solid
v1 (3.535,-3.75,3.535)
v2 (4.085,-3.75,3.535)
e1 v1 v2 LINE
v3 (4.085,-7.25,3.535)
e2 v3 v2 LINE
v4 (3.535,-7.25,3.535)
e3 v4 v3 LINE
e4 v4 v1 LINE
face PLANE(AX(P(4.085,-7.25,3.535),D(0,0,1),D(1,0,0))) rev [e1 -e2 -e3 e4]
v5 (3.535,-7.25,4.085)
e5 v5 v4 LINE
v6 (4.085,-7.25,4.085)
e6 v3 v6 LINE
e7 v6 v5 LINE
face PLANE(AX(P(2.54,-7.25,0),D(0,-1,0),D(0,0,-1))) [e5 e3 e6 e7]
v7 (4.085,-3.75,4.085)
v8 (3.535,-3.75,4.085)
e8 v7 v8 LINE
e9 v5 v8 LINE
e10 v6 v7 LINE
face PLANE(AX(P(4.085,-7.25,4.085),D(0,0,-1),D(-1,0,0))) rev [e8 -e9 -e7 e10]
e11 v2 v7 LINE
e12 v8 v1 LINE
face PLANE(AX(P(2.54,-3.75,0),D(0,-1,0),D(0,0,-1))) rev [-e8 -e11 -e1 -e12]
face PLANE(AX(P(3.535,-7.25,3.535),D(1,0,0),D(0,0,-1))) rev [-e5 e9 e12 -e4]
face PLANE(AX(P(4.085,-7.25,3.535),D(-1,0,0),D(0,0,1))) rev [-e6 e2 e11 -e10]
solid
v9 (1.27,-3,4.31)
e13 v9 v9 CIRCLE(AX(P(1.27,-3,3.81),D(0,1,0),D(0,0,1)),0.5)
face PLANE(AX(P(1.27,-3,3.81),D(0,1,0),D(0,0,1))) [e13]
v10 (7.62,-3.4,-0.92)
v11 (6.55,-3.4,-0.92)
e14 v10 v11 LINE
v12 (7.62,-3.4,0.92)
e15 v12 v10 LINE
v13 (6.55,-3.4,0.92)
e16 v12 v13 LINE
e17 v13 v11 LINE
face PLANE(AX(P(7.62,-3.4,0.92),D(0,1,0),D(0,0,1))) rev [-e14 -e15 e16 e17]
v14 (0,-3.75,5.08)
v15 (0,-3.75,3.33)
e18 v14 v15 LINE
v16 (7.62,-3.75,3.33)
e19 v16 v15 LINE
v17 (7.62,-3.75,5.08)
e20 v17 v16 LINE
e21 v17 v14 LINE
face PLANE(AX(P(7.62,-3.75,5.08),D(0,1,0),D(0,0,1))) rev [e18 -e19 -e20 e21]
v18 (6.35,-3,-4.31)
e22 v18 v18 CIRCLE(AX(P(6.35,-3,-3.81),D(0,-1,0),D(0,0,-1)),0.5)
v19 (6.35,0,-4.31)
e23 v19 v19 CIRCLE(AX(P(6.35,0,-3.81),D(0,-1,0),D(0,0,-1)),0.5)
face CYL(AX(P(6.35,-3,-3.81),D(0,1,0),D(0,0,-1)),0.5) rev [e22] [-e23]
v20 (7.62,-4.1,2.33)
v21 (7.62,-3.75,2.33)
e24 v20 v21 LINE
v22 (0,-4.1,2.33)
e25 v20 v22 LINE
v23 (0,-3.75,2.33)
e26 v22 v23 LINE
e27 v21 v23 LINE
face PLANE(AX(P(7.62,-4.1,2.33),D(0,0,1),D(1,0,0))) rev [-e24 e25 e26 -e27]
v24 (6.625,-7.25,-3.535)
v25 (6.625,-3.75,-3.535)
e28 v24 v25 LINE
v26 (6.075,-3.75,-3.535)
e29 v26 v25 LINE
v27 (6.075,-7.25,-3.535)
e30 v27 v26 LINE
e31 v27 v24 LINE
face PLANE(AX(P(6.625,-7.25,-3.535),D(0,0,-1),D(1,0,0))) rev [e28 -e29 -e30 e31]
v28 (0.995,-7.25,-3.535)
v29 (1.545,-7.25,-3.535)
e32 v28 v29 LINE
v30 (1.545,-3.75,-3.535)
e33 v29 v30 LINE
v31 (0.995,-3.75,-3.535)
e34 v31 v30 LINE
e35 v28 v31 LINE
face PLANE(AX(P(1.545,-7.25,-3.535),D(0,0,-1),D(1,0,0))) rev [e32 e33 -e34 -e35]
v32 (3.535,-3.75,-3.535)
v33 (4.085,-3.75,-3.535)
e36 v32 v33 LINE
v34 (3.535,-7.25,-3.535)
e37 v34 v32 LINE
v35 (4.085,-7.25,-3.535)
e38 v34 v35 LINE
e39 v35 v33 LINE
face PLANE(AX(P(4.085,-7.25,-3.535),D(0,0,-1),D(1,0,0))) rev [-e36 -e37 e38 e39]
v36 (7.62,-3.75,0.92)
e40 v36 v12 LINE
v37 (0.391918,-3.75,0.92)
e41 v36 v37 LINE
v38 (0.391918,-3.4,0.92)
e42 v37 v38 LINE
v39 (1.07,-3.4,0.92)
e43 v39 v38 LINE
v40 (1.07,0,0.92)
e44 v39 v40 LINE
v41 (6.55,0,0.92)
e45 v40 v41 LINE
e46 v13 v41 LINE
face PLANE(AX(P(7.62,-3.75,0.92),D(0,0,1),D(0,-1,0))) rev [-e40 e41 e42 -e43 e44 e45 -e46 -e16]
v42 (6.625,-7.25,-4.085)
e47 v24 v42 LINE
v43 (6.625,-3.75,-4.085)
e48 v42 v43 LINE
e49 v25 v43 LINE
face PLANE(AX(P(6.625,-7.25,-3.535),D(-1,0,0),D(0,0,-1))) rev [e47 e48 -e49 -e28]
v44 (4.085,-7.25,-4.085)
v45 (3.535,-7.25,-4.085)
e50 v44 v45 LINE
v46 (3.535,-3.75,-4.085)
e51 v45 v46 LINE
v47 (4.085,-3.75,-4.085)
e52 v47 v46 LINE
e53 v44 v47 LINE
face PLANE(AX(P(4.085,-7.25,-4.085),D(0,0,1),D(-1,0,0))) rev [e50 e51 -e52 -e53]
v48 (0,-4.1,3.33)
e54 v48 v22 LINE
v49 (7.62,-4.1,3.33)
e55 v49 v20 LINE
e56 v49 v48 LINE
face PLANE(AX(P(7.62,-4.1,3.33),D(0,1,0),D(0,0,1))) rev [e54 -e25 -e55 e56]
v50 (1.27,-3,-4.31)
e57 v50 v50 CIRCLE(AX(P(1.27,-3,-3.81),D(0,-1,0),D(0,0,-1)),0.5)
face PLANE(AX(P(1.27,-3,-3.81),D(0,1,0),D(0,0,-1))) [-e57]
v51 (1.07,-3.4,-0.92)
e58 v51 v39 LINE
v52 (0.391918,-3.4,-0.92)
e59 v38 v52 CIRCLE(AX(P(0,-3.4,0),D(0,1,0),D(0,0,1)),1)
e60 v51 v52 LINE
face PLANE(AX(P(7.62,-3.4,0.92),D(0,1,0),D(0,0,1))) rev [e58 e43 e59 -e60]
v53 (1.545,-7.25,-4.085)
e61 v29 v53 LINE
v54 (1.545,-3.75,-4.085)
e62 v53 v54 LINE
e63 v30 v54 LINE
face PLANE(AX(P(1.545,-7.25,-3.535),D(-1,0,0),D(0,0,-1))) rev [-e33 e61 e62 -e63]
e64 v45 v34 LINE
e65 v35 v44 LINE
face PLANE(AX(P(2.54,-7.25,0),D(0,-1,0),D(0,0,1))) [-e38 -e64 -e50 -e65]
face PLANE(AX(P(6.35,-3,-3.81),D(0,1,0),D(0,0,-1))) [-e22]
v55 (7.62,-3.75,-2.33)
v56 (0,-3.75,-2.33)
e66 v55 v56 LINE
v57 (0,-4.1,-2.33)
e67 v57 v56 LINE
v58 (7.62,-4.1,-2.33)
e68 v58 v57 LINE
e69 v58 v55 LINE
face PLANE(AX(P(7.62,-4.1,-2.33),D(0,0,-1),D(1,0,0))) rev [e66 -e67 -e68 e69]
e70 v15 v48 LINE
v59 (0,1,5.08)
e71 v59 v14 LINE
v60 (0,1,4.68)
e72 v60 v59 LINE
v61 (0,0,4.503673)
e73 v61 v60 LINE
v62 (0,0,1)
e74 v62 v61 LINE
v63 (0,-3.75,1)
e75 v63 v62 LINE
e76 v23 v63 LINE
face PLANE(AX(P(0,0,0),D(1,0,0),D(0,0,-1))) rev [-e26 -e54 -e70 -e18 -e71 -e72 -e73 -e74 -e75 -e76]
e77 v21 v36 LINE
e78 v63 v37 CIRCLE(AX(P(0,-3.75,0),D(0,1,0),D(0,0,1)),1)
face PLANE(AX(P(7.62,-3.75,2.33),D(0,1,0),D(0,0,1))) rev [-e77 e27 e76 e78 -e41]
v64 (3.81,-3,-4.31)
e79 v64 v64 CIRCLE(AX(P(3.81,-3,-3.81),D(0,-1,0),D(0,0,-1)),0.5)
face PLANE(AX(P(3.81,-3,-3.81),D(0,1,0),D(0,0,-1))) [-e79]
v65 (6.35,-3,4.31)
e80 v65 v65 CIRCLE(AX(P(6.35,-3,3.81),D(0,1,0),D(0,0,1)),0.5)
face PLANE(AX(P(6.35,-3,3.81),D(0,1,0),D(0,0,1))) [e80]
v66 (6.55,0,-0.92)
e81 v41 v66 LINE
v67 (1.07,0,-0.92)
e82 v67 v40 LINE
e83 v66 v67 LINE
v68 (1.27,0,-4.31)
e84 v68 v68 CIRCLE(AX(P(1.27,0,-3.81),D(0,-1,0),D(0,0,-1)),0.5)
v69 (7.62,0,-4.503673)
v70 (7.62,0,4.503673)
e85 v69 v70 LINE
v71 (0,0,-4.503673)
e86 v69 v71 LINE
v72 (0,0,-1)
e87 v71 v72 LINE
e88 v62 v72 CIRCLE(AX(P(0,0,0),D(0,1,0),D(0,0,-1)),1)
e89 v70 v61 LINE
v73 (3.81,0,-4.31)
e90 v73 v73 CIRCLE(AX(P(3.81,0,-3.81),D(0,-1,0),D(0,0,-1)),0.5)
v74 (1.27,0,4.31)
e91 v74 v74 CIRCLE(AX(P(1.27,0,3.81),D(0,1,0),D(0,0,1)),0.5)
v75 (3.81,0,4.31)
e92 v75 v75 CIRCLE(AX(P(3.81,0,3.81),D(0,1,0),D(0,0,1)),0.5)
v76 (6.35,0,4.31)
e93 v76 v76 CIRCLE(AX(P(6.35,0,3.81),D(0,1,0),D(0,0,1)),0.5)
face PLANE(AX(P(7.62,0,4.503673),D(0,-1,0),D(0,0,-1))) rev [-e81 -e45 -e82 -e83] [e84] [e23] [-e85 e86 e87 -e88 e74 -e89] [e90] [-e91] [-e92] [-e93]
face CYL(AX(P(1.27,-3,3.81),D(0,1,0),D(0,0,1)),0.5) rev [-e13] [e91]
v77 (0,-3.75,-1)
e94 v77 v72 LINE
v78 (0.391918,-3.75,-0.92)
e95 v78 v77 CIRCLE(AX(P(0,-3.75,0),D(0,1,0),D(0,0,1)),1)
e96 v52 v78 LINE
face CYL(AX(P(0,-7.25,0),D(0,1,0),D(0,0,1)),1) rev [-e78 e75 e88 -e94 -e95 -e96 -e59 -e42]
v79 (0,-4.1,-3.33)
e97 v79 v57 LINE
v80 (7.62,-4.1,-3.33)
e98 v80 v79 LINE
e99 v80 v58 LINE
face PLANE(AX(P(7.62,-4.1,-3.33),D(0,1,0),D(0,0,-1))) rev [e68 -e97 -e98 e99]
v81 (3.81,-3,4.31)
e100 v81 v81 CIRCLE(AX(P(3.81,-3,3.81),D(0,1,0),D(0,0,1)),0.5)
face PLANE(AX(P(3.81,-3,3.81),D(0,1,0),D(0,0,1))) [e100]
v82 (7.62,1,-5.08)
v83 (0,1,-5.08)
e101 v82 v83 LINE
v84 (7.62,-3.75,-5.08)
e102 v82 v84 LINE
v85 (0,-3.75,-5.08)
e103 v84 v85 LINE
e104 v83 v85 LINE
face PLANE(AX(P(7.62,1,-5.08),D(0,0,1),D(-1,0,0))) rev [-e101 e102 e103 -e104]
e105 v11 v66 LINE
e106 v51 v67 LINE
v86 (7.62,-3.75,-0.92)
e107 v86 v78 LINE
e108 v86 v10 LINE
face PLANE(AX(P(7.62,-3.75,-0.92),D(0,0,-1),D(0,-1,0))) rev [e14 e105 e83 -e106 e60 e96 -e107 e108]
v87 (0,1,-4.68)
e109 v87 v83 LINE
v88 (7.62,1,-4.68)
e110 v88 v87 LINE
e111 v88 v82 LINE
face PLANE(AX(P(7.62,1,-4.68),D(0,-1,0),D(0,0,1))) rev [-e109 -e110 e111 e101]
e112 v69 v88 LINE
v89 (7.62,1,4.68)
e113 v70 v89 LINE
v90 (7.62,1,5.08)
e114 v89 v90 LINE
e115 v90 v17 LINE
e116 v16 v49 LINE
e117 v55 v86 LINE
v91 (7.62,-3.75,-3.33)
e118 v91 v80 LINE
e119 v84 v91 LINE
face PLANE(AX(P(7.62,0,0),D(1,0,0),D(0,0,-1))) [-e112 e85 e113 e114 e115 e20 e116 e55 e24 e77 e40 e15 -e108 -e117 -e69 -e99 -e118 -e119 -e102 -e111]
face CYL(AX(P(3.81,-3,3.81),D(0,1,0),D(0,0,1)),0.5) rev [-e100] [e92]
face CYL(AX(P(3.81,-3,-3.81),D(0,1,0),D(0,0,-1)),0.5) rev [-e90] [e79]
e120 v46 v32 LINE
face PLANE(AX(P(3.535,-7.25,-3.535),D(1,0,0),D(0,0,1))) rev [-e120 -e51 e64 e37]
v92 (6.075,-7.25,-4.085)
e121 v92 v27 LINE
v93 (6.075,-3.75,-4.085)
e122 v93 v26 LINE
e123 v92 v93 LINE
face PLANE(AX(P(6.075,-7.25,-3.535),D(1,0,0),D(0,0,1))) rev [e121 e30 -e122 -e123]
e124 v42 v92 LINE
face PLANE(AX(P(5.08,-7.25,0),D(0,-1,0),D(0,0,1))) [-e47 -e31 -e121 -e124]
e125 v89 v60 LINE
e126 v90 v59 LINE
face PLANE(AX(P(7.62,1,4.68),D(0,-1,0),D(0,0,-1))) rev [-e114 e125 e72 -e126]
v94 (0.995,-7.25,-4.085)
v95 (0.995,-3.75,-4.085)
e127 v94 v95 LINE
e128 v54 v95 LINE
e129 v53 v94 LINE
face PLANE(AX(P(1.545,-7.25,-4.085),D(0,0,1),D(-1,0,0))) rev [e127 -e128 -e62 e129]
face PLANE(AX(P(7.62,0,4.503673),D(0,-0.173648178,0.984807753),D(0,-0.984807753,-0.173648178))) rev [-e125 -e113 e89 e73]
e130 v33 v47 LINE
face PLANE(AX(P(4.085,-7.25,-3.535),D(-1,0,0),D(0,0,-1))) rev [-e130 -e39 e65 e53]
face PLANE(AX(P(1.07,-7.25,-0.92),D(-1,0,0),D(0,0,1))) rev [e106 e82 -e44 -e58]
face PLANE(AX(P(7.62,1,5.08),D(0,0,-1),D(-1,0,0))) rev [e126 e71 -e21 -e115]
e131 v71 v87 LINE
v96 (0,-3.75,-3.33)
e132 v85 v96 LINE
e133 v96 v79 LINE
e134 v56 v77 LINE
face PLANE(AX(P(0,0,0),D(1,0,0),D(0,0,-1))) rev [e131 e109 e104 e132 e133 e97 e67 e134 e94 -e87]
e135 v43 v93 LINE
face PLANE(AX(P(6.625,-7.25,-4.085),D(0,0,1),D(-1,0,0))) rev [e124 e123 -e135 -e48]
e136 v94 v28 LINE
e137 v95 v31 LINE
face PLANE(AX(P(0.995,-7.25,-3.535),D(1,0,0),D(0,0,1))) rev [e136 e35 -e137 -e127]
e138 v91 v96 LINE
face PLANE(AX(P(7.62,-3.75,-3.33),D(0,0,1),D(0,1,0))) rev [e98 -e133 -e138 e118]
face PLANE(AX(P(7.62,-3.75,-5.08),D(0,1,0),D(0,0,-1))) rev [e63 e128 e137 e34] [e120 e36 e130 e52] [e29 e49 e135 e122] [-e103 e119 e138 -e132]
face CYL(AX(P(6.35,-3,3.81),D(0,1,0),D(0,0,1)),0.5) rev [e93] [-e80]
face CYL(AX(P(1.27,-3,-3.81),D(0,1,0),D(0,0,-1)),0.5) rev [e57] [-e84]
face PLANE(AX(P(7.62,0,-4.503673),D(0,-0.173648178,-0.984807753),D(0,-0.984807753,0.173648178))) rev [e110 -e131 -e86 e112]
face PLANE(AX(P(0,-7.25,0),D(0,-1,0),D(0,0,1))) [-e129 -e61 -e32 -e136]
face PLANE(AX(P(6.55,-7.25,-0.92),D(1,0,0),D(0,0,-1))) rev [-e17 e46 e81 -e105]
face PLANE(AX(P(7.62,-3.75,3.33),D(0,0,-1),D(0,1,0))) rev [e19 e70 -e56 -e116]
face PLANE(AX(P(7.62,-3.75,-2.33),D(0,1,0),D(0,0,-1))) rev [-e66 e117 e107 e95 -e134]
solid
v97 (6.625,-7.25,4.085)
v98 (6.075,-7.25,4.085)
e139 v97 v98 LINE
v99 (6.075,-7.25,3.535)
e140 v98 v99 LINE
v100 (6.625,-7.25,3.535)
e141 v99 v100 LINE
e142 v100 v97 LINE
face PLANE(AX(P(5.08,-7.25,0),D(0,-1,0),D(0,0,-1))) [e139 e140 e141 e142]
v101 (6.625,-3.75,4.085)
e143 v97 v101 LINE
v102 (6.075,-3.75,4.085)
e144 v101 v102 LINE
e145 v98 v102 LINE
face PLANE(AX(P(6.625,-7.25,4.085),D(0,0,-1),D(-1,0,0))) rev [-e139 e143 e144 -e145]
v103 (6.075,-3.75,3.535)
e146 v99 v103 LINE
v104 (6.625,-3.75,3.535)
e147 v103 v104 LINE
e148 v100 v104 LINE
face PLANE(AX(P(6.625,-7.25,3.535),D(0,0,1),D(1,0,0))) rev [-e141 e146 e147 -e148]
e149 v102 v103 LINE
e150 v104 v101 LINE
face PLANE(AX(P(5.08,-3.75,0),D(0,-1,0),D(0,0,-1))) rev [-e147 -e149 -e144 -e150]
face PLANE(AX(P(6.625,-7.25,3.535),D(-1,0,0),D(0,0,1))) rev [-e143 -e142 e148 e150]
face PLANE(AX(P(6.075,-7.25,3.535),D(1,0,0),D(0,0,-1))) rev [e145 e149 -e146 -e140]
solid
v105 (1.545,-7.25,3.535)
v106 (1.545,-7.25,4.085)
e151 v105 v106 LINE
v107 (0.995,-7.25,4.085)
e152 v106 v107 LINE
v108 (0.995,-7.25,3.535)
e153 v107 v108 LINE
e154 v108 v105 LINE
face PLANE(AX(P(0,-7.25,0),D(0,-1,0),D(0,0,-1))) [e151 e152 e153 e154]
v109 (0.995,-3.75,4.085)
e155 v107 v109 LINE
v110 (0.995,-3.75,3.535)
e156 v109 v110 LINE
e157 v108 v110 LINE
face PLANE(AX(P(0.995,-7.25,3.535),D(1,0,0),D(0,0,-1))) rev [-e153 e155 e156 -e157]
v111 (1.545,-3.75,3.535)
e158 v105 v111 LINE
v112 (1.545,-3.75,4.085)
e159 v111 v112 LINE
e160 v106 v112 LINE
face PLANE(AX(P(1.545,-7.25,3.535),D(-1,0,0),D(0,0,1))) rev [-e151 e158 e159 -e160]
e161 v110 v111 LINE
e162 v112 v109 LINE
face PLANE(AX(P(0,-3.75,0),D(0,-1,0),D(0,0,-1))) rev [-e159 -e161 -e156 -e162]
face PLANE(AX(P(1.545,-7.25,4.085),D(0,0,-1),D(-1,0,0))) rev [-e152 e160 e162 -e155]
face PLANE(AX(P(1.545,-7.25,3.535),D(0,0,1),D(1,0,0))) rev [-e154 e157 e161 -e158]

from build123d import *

# Parameters (mm, degrees)
SOCKET_HOUSING_DEPTH  = 7.62
SKETCH3_R             = 0.5
HOLES_DEPTH           = 3
SKETCH4_W             = 0.55
SKETCH4_H             = 0.55
PINS_DEPTH            = 3.5
LPATTERN3_START       = 6.075
LPATTERN3_OUTLINE_W   = 3.5
LPATTERN3_OUTLINE_H   = 0.55
LPATTERN3_DEPTH       = 0.55
LPATTERN3_START_2     = 3.535
LPATTERN3_2_OUTLINE_W = 3.5
LPATTERN3_2_OUTLINE_H = 0.55
LPATTERN3_2_DEPTH     = 0.55
LPATTERN3_START_3     = -3
LPATTERN3_3_OUTLINE_R = 0.5
LPATTERN3_3_DEPTH     = 3
MIRROR2_START         = -3
MIRROR2_OUTLINE_R     = 0.5
MIRROR2_DEPTH         = 3
MIRROR2_START_2       = -7.25
MIRROR2_2_OUTLINE_W   = 0.55
MIRROR2_2_OUTLINE_H   = 0.55
MIRROR2_2_DEPTH       = 3.5
SKETCH5_W             = 5.48
SKETCH5_H             = 1.84
CUT_EXTRUDE3_DEPTH    = 12.6804666


# Read off the part's stored shape, not the designer's step: LPattern3, Mirror2
with BuildPart() as part:
    # Sketch2 → socket_housing (new body)
    with BuildSketch(Plane(origin=(0, 0, 0), x_dir=(0, 0, -1), z_dir=(1, 0, 0))):
        Polygon((-5.08, -3.75), (-3.33, -3.75), (-3.33, -4.1), (-2.33, -4.1), (-2.33, -3.75), (-0.92, -3.75), (-0.92, -3.4), (0, -3.4), (0, 0), (-4.503673019, 0), (-4.68, 1), (-5.08, 1), align=None)
    socket_housing = extrude(amount=SOCKET_HOUSING_DEPTH)

    # Sketch3 → holes (cut)
    with BuildSketch(Plane(origin=(0, 0, 0), x_dir=(1, 0, 0), z_dir=(0, 1, 0))):
        with Locations(Location((1.27, -3.81, 0), (0, 0, 270))):
            Circle(SKETCH3_R)
    extrude(amount=-HOLES_DEPTH, mode=Mode.SUBTRACT)

    # LPattern3 3 outline → LPattern3 3 (cut)
    with BuildSketch(Plane(origin=(0, 0, 0), x_dir=(1, 0, 0), z_dir=(0, 1, 0)).offset(LPATTERN3_START_3)):
        with Locations((6.35, -3.81)):
            Circle(LPATTERN3_3_OUTLINE_R)
        with Locations((3.81, -3.81)):
            Circle(LPATTERN3_3_OUTLINE_R)
    extrude(amount=LPATTERN3_3_DEPTH, mode=Mode.SUBTRACT)

    # Mirror1: socket_housing across plane
    add(socket_housing.mirror(Plane.XY))

    # Mirror2 outline → Mirror2 (cut)
    with BuildSketch(Plane(origin=(0, 0, 0), x_dir=(1, 0, 0), z_dir=(0, 1, 0)).offset(MIRROR2_START)):
        with Locations((6.35, 3.81)):
            Circle(MIRROR2_OUTLINE_R)
        with Locations((3.81, 3.81)):
            Circle(MIRROR2_OUTLINE_R)
        with Locations((1.27, 3.81)):
            Circle(MIRROR2_OUTLINE_R)
    extrude(amount=MIRROR2_DEPTH, mode=Mode.SUBTRACT)

    # Mirror2 2 outline → Mirror2 2 (add)
    with BuildSketch(Plane(origin=(0, 0, 0), x_dir=(1, 0, 0), z_dir=(0, 1, 0)).offset(MIRROR2_START_2)):
        with Locations((6.35, 3.81)):
            Rectangle(MIRROR2_2_OUTLINE_W, MIRROR2_2_OUTLINE_H)
        with Locations((3.81, 3.81)):
            Rectangle(MIRROR2_2_OUTLINE_W, MIRROR2_2_OUTLINE_H)
        with Locations((1.27, 3.81)):
            Rectangle(MIRROR2_2_OUTLINE_W, MIRROR2_2_OUTLINE_H)
    extrude(amount=MIRROR2_2_DEPTH)

    # Sketch5 → Cut-Extrude3 (cut, through all)
    with BuildSketch(Plane(origin=(0, 0, 0), x_dir=(1, 0, 0), z_dir=(0, 1, 0))):
        with BuildLine():
            Line((0, 1), (0, -1))
            ThreePointArc((0, -1), (1, 0), (0, 1))
        make_face()
        with Locations((3.81, 0)):
            Rectangle(SKETCH5_W, SKETCH5_H)
    extrude(amount=-CUT_EXTRUDE3_DEPTH, mode=Mode.SUBTRACT)


with BuildPart() as body_2:
    # Sketch4 → pins (new body)
    with BuildSketch(Plane.XZ.offset(3.75)):
        with Locations((1.27, 3.81)):
            Rectangle(SKETCH4_W, SKETCH4_H)
    extrude(amount=PINS_DEPTH)


with BuildPart() as body_3:
    # LPattern3 outline → LPattern3 (new body)
    with BuildSketch(Plane.YZ.offset(LPATTERN3_START)):
        with Locations((-5.5, 3.81)):
            Rectangle(LPATTERN3_OUTLINE_W, LPATTERN3_OUTLINE_H)
    extrude(amount=LPATTERN3_DEPTH)


with BuildPart() as body_4:
    # LPattern3 2 outline → LPattern3 2 (new body)
    with BuildSketch(Plane.YZ.offset(LPATTERN3_START_2)):
        with Locations((-5.5, 3.81)):
            Rectangle(LPATTERN3_2_OUTLINE_W, LPATTERN3_2_OUTLINE_H)
    extrude(amount=LPATTERN3_2_DEPTH)


solid = Compound([part.part, body_2.part, body_3.part, body_4.part])
